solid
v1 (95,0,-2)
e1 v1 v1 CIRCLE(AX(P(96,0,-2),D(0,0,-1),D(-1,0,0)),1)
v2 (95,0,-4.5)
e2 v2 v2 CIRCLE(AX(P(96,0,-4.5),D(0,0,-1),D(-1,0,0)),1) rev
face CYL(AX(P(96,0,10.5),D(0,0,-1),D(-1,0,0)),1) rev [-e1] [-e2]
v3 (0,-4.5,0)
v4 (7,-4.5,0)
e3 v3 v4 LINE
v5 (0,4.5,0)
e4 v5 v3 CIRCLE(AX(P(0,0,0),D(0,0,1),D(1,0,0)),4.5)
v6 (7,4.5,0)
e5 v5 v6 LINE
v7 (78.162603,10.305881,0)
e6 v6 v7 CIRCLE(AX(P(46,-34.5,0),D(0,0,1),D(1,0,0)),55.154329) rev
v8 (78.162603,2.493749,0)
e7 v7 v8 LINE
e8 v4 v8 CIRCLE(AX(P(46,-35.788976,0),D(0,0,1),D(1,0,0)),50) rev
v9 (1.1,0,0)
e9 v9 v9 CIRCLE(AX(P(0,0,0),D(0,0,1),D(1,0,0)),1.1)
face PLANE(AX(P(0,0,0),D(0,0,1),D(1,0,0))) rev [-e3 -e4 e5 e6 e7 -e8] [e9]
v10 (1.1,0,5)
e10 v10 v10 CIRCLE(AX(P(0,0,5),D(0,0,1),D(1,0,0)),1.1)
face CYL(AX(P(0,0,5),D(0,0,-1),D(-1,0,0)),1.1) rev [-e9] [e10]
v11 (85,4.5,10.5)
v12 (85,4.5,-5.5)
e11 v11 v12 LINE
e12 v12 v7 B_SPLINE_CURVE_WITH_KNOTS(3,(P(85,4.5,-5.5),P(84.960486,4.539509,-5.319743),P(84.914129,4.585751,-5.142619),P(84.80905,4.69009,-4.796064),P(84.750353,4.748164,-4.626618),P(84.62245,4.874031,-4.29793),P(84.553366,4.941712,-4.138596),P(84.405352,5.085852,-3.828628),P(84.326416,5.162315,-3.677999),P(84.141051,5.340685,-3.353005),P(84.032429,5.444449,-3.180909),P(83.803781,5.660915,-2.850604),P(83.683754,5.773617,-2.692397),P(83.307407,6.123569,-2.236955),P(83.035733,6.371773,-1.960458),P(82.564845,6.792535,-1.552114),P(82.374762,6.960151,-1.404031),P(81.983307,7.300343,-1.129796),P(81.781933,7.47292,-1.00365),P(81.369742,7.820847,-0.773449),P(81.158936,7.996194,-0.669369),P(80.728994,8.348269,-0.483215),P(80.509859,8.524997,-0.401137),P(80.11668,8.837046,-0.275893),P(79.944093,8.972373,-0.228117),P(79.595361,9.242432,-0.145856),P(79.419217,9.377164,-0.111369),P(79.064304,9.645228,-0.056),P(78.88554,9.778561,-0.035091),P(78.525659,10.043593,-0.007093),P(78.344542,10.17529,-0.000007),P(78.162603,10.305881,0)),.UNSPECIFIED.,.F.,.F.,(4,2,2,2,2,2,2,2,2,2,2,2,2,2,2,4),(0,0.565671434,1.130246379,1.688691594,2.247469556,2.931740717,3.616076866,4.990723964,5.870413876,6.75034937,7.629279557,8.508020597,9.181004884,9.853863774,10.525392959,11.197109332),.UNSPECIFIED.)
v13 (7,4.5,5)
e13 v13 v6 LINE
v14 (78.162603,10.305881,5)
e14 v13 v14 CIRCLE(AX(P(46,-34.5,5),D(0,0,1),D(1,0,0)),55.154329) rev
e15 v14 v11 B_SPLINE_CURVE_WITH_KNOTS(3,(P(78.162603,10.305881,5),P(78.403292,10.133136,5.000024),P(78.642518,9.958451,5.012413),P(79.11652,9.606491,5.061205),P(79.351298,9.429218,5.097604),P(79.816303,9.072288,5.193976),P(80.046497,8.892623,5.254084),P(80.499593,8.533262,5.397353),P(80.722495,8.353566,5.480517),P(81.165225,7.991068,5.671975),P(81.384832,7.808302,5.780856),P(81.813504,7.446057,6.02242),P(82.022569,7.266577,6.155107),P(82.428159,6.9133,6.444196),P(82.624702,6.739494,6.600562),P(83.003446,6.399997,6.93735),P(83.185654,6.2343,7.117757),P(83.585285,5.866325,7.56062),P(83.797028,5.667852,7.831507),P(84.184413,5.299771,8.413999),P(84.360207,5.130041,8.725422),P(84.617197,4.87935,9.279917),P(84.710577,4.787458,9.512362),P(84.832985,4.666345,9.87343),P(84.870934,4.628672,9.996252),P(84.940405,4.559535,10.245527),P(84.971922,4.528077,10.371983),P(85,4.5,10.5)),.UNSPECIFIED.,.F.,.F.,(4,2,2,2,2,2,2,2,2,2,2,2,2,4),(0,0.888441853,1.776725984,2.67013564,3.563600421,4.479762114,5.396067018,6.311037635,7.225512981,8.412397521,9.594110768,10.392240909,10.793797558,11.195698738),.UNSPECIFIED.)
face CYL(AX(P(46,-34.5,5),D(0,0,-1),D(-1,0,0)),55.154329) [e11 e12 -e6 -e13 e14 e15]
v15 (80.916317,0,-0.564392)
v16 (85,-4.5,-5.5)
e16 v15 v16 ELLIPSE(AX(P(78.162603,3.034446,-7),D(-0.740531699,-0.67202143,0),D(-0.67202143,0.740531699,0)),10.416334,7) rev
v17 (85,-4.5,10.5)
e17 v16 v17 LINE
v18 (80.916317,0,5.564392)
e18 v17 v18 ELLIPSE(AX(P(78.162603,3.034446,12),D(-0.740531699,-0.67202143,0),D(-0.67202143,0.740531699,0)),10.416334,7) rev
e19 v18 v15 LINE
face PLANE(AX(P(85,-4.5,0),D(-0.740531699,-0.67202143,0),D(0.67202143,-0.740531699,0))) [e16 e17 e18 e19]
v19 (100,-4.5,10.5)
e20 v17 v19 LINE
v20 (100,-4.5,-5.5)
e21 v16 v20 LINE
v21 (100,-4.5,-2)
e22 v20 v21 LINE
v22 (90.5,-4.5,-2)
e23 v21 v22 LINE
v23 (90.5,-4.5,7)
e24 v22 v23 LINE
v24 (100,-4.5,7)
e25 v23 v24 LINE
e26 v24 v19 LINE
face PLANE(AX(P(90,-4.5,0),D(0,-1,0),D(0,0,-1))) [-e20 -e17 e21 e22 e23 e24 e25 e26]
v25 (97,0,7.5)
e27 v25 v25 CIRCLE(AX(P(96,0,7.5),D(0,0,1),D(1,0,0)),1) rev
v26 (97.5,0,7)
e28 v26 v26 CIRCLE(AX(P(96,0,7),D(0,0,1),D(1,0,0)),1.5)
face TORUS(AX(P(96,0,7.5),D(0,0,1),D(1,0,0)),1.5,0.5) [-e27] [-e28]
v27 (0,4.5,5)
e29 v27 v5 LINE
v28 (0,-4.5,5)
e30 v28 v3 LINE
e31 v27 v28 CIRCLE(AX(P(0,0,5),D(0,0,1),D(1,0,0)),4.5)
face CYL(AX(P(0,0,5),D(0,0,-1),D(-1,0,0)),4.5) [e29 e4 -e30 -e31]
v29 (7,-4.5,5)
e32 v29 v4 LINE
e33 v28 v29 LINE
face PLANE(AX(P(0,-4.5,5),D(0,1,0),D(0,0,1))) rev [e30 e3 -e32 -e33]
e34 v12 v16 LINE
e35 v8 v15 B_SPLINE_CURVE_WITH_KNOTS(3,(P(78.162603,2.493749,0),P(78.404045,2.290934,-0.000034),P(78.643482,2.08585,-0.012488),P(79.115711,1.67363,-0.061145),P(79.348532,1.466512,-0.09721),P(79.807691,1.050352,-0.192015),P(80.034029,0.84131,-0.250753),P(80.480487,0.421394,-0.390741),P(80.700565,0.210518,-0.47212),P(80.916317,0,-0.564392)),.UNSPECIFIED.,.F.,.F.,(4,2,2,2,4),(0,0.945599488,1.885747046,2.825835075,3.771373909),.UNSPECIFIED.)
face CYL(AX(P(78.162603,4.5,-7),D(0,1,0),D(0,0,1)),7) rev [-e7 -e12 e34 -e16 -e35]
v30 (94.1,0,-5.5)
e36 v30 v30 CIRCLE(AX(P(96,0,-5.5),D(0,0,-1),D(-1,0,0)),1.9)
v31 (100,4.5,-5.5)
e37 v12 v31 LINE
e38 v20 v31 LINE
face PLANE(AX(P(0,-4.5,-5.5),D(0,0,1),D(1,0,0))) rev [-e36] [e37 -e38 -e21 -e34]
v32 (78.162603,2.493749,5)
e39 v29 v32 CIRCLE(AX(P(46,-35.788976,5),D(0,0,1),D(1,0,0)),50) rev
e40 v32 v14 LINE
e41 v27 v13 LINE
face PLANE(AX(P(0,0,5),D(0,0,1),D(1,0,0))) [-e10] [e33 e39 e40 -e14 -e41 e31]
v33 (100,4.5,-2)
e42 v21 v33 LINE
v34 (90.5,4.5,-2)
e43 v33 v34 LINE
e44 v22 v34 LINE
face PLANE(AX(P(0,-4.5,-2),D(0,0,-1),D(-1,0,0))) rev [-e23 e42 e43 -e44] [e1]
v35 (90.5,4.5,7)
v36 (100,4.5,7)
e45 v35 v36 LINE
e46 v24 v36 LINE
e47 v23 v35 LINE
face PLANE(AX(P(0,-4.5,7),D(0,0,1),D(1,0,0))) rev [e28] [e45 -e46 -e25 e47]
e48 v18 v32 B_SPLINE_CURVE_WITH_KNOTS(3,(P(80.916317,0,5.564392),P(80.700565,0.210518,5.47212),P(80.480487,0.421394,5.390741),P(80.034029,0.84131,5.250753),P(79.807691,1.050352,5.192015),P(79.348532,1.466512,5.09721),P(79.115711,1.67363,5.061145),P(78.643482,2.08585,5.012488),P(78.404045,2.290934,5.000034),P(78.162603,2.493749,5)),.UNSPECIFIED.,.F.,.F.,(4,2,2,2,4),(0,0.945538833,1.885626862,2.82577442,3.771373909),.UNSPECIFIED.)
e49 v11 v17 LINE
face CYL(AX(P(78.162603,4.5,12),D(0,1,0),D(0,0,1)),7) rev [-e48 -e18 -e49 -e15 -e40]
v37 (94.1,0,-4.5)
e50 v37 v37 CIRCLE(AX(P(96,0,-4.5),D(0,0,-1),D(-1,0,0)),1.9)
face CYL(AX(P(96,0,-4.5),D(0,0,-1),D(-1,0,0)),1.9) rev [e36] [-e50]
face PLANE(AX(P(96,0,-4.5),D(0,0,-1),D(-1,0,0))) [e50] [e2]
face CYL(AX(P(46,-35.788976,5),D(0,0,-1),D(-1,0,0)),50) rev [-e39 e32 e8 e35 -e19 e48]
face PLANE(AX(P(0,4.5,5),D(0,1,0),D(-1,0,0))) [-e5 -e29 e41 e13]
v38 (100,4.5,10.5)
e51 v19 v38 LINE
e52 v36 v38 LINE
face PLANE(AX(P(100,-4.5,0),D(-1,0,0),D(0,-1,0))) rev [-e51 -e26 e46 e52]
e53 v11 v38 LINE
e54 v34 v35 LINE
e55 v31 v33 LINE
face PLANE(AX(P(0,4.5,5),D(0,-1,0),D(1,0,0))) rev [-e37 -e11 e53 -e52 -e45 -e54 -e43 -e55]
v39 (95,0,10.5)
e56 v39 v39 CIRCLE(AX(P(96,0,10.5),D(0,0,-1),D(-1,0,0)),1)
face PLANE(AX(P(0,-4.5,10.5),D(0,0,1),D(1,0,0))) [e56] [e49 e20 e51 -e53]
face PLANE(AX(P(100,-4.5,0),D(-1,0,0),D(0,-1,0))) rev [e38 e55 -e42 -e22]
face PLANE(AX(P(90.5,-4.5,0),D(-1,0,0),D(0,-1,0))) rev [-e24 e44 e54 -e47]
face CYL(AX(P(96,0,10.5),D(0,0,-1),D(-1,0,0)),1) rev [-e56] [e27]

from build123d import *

# Parameters (mm, degrees)
SKETCH1_R           = 1.1
BOSS_EXTRUDE1_DEPTH = 5
BOSS_EXTRUDE2_DEPTH = 5
BOSS_EXTRUDE3_DEPTH = 9
SKETCH5_R           = 1
CUT_EXTRUDE1_DEPTH  = 16
SKETCH6_R           = 1.9
CUT_EXTRUDE2_DEPTH  = 1
FILLET1_R           = 0.5
SKETCH7_W           = 5
SKETCH7_H           = 16
BOSS_EXTRUDE4_DEPTH = 9
FILLET2_R           = 7


with BuildPart() as part:
    # Sketch1 → Boss-Extrude1 (new body)
    with BuildSketch(Plane.XY):
        with BuildLine():
            ThreePointArc((0, 4.5), (-4.5, 0), (0, -4.5))
            Line((0, -4.5), (7, -4.5))
            ThreePointArc((7, -4.5), (42.961642557, 14.118622766), (80.916317371, 0))
            Line((80.916317371, 0), (90, 0))
            Line((90, 0), (90, 4.5))
            Line((90, 4.5), (85, 4.5))
            ThreePointArc((85, 4.5), (46, 20.654328933), (7, 4.5))
            Line((7, 4.5), (0, 4.5))
        make_face()
        Circle(SKETCH1_R, mode=Mode.SUBTRACT)
    extrude(amount=BOSS_EXTRUDE1_DEPTH)

    # Sketch3 → Boss-Extrude2 (add)
    with BuildSketch(Plane.XY.offset(5)):
        Polygon((90, 0), (90, -4.5), (85, -4.5), (80.916317371, 0), align=None)
    extrude(amount=-BOSS_EXTRUDE2_DEPTH)

    # Sketch4 → Boss-Extrude3 (add)
    with BuildSketch(Plane(origin=(0, 4.5, 0), x_dir=(1, 0, 0), z_dir=(0, 1, 0))):
        Polygon((90.5, 2), (100, 2), (100, 5.5), (90, 5.5), (90, 0), (90, -5), (90, -10.5), (100, -10.5), (100, -7), (90.5, -7), align=None)
    extrude(amount=-BOSS_EXTRUDE3_DEPTH)

    # Sketch5 → Cut-Extrude1 (cut)
    with BuildSketch(Plane(origin=(0, 0, -5.5), x_dir=(-1, 0, 0), z_dir=(0, 0, -1))):
        with Locations((-96, 0)):
            Circle(SKETCH5_R)
    extrude(amount=-CUT_EXTRUDE1_DEPTH, mode=Mode.SUBTRACT)

    # Sketch6 → Cut-Extrude2 (cut)
    with BuildSketch(Plane(origin=(0, 0, -5.5), x_dir=(-1, 0, 0), z_dir=(0, 0, -1))):
        with Locations((-96, 0)):
            Circle(SKETCH6_R)
    extrude(amount=-CUT_EXTRUDE2_DEPTH, mode=Mode.SUBTRACT)

    # Fillet1
    fillet1_edges = [part.edges().sort_by_distance(p)[0] for p in [
        (97, 0, 7),
    ]]
    fillet(fillet1_edges, radius=FILLET1_R)

    # Sketch7 → Boss-Extrude4 (add)
    with BuildSketch(Plane.XZ.offset(4.5)):
        with Locations((87.5, 2.5)):
            Rectangle(SKETCH7_W, SKETCH7_H)
    extrude(amount=-BOSS_EXTRUDE4_DEPTH)

    # Fillet2
    # the kernel refuses this fillet: 7 mm, written as the material it adds along each edge
    with BuildSketch(Plane(origin=(85, 21.593492914, 0), x_dir=(0, 0, -1), z_dir=(0, -1, 0))) as fillet2_piece_1_section:
        with BuildLine():
            CenterArc((7, -6.837397166), FILLET2_R, 102.373625116, 77.626374884)
            Line((0, -6.837397166), (0, 0))
            Line((0, 0), (5.5, 0))
        make_face()
    fillet2_piece_1 = extrude(amount=43.186985828, mode=Mode.PRIVATE)
    fillet2_piece_1 = fillet2_piece_1 & Plane(origin=(46, -34.5, 0), x_dir=(0.7071067811865476, 0.7071067811865476, 0), z_dir=(0, 0, -1)) * Cylinder(55.154328933, 114, mode=Mode.PRIVATE)
    fillet2_piece_1 = split(fillet2_piece_1, bisect_by=Plane(origin=(72.014490495, 9.809337449, 0), z_dir=(0.7405316990978602, 0.6720214301874877, 0)), keep=Keep.TOP, mode=Mode.PRIVATE)
    add(fillet2_piece_1)
    with BuildSketch(Plane(origin=(85, 4.5, 0), x_dir=(0, 0, -1), z_dir=(0, -1, 0))) as fillet2_piece_2_section:
        with BuildLine():
            CenterArc((7, -6.837397166), FILLET2_R, 102.373625116, 77.626374884)
            Line((0, -6.837397166), (0, 0))
            Line((0, 0), (5.5, 0))
        make_face()
    fillet2_piece_2 = extrude(amount=26.093492914, mode=Mode.PRIVATE)
    fillet2_piece_2 = fillet2_piece_2 - Plane(origin=(46, -35.788975694, 0), x_dir=(-0.7799999999999994, 0.6257795138864816, 0), z_dir=(0, 0, -1)) * Cylinder(50, 80, mode=Mode.PRIVATE)
    add(fillet2_piece_2)
    with BuildSketch(Plane(origin=(85, 21.593492914, 5), x_dir=(-1, 0, 0), z_dir=(0, -1, 0))) as fillet2_piece_3_section:
        with BuildLine():
            CenterArc((6.837397166, -7), FILLET2_R, 90, 77.626374884)
            Line((0, -5.5), (0, 0))
            Line((0, 0), (6.837397166, 0))
        make_face()
    fillet2_piece_3 = extrude(amount=43.186985828, mode=Mode.PRIVATE)
    fillet2_piece_3 = fillet2_piece_3 & Plane(origin=(46, -34.5, 5), x_dir=(0.7071067811865476, 0.7071067811865476, 0), z_dir=(0, 0, -1)) * Cylinder(55.154328933, 114, mode=Mode.PRIVATE)
    fillet2_piece_3 = split(fillet2_piece_3, bisect_by=Plane(origin=(72.014490495, 9.809337449, 5), z_dir=(0.7405316990978602, 0.6720214301874877, 0)), keep=Keep.TOP, mode=Mode.PRIVATE)
    add(fillet2_piece_3)
    with BuildSketch(Plane(origin=(85, 4.5, 5), x_dir=(-1, 0, 0), z_dir=(0, -1, 0))) as fillet2_piece_4_section:
        with BuildLine():
            CenterArc((6.837397166, -7), FILLET2_R, 90, 77.626374884)
            Line((0, -5.5), (0, 0))
            Line((0, 0), (6.837397166, 0))
        make_face()
    fillet2_piece_4 = extrude(amount=26.093492914, mode=Mode.PRIVATE)
    fillet2_piece_4 = fillet2_piece_4 - Plane(origin=(46, -35.788975694, 5), x_dir=(-0.7799999999999994, 0.6257795138864816, 0), z_dir=(0, 0, -1)) * Cylinder(50, 80, mode=Mode.PRIVATE)
    add(fillet2_piece_4)


solid = part.part
